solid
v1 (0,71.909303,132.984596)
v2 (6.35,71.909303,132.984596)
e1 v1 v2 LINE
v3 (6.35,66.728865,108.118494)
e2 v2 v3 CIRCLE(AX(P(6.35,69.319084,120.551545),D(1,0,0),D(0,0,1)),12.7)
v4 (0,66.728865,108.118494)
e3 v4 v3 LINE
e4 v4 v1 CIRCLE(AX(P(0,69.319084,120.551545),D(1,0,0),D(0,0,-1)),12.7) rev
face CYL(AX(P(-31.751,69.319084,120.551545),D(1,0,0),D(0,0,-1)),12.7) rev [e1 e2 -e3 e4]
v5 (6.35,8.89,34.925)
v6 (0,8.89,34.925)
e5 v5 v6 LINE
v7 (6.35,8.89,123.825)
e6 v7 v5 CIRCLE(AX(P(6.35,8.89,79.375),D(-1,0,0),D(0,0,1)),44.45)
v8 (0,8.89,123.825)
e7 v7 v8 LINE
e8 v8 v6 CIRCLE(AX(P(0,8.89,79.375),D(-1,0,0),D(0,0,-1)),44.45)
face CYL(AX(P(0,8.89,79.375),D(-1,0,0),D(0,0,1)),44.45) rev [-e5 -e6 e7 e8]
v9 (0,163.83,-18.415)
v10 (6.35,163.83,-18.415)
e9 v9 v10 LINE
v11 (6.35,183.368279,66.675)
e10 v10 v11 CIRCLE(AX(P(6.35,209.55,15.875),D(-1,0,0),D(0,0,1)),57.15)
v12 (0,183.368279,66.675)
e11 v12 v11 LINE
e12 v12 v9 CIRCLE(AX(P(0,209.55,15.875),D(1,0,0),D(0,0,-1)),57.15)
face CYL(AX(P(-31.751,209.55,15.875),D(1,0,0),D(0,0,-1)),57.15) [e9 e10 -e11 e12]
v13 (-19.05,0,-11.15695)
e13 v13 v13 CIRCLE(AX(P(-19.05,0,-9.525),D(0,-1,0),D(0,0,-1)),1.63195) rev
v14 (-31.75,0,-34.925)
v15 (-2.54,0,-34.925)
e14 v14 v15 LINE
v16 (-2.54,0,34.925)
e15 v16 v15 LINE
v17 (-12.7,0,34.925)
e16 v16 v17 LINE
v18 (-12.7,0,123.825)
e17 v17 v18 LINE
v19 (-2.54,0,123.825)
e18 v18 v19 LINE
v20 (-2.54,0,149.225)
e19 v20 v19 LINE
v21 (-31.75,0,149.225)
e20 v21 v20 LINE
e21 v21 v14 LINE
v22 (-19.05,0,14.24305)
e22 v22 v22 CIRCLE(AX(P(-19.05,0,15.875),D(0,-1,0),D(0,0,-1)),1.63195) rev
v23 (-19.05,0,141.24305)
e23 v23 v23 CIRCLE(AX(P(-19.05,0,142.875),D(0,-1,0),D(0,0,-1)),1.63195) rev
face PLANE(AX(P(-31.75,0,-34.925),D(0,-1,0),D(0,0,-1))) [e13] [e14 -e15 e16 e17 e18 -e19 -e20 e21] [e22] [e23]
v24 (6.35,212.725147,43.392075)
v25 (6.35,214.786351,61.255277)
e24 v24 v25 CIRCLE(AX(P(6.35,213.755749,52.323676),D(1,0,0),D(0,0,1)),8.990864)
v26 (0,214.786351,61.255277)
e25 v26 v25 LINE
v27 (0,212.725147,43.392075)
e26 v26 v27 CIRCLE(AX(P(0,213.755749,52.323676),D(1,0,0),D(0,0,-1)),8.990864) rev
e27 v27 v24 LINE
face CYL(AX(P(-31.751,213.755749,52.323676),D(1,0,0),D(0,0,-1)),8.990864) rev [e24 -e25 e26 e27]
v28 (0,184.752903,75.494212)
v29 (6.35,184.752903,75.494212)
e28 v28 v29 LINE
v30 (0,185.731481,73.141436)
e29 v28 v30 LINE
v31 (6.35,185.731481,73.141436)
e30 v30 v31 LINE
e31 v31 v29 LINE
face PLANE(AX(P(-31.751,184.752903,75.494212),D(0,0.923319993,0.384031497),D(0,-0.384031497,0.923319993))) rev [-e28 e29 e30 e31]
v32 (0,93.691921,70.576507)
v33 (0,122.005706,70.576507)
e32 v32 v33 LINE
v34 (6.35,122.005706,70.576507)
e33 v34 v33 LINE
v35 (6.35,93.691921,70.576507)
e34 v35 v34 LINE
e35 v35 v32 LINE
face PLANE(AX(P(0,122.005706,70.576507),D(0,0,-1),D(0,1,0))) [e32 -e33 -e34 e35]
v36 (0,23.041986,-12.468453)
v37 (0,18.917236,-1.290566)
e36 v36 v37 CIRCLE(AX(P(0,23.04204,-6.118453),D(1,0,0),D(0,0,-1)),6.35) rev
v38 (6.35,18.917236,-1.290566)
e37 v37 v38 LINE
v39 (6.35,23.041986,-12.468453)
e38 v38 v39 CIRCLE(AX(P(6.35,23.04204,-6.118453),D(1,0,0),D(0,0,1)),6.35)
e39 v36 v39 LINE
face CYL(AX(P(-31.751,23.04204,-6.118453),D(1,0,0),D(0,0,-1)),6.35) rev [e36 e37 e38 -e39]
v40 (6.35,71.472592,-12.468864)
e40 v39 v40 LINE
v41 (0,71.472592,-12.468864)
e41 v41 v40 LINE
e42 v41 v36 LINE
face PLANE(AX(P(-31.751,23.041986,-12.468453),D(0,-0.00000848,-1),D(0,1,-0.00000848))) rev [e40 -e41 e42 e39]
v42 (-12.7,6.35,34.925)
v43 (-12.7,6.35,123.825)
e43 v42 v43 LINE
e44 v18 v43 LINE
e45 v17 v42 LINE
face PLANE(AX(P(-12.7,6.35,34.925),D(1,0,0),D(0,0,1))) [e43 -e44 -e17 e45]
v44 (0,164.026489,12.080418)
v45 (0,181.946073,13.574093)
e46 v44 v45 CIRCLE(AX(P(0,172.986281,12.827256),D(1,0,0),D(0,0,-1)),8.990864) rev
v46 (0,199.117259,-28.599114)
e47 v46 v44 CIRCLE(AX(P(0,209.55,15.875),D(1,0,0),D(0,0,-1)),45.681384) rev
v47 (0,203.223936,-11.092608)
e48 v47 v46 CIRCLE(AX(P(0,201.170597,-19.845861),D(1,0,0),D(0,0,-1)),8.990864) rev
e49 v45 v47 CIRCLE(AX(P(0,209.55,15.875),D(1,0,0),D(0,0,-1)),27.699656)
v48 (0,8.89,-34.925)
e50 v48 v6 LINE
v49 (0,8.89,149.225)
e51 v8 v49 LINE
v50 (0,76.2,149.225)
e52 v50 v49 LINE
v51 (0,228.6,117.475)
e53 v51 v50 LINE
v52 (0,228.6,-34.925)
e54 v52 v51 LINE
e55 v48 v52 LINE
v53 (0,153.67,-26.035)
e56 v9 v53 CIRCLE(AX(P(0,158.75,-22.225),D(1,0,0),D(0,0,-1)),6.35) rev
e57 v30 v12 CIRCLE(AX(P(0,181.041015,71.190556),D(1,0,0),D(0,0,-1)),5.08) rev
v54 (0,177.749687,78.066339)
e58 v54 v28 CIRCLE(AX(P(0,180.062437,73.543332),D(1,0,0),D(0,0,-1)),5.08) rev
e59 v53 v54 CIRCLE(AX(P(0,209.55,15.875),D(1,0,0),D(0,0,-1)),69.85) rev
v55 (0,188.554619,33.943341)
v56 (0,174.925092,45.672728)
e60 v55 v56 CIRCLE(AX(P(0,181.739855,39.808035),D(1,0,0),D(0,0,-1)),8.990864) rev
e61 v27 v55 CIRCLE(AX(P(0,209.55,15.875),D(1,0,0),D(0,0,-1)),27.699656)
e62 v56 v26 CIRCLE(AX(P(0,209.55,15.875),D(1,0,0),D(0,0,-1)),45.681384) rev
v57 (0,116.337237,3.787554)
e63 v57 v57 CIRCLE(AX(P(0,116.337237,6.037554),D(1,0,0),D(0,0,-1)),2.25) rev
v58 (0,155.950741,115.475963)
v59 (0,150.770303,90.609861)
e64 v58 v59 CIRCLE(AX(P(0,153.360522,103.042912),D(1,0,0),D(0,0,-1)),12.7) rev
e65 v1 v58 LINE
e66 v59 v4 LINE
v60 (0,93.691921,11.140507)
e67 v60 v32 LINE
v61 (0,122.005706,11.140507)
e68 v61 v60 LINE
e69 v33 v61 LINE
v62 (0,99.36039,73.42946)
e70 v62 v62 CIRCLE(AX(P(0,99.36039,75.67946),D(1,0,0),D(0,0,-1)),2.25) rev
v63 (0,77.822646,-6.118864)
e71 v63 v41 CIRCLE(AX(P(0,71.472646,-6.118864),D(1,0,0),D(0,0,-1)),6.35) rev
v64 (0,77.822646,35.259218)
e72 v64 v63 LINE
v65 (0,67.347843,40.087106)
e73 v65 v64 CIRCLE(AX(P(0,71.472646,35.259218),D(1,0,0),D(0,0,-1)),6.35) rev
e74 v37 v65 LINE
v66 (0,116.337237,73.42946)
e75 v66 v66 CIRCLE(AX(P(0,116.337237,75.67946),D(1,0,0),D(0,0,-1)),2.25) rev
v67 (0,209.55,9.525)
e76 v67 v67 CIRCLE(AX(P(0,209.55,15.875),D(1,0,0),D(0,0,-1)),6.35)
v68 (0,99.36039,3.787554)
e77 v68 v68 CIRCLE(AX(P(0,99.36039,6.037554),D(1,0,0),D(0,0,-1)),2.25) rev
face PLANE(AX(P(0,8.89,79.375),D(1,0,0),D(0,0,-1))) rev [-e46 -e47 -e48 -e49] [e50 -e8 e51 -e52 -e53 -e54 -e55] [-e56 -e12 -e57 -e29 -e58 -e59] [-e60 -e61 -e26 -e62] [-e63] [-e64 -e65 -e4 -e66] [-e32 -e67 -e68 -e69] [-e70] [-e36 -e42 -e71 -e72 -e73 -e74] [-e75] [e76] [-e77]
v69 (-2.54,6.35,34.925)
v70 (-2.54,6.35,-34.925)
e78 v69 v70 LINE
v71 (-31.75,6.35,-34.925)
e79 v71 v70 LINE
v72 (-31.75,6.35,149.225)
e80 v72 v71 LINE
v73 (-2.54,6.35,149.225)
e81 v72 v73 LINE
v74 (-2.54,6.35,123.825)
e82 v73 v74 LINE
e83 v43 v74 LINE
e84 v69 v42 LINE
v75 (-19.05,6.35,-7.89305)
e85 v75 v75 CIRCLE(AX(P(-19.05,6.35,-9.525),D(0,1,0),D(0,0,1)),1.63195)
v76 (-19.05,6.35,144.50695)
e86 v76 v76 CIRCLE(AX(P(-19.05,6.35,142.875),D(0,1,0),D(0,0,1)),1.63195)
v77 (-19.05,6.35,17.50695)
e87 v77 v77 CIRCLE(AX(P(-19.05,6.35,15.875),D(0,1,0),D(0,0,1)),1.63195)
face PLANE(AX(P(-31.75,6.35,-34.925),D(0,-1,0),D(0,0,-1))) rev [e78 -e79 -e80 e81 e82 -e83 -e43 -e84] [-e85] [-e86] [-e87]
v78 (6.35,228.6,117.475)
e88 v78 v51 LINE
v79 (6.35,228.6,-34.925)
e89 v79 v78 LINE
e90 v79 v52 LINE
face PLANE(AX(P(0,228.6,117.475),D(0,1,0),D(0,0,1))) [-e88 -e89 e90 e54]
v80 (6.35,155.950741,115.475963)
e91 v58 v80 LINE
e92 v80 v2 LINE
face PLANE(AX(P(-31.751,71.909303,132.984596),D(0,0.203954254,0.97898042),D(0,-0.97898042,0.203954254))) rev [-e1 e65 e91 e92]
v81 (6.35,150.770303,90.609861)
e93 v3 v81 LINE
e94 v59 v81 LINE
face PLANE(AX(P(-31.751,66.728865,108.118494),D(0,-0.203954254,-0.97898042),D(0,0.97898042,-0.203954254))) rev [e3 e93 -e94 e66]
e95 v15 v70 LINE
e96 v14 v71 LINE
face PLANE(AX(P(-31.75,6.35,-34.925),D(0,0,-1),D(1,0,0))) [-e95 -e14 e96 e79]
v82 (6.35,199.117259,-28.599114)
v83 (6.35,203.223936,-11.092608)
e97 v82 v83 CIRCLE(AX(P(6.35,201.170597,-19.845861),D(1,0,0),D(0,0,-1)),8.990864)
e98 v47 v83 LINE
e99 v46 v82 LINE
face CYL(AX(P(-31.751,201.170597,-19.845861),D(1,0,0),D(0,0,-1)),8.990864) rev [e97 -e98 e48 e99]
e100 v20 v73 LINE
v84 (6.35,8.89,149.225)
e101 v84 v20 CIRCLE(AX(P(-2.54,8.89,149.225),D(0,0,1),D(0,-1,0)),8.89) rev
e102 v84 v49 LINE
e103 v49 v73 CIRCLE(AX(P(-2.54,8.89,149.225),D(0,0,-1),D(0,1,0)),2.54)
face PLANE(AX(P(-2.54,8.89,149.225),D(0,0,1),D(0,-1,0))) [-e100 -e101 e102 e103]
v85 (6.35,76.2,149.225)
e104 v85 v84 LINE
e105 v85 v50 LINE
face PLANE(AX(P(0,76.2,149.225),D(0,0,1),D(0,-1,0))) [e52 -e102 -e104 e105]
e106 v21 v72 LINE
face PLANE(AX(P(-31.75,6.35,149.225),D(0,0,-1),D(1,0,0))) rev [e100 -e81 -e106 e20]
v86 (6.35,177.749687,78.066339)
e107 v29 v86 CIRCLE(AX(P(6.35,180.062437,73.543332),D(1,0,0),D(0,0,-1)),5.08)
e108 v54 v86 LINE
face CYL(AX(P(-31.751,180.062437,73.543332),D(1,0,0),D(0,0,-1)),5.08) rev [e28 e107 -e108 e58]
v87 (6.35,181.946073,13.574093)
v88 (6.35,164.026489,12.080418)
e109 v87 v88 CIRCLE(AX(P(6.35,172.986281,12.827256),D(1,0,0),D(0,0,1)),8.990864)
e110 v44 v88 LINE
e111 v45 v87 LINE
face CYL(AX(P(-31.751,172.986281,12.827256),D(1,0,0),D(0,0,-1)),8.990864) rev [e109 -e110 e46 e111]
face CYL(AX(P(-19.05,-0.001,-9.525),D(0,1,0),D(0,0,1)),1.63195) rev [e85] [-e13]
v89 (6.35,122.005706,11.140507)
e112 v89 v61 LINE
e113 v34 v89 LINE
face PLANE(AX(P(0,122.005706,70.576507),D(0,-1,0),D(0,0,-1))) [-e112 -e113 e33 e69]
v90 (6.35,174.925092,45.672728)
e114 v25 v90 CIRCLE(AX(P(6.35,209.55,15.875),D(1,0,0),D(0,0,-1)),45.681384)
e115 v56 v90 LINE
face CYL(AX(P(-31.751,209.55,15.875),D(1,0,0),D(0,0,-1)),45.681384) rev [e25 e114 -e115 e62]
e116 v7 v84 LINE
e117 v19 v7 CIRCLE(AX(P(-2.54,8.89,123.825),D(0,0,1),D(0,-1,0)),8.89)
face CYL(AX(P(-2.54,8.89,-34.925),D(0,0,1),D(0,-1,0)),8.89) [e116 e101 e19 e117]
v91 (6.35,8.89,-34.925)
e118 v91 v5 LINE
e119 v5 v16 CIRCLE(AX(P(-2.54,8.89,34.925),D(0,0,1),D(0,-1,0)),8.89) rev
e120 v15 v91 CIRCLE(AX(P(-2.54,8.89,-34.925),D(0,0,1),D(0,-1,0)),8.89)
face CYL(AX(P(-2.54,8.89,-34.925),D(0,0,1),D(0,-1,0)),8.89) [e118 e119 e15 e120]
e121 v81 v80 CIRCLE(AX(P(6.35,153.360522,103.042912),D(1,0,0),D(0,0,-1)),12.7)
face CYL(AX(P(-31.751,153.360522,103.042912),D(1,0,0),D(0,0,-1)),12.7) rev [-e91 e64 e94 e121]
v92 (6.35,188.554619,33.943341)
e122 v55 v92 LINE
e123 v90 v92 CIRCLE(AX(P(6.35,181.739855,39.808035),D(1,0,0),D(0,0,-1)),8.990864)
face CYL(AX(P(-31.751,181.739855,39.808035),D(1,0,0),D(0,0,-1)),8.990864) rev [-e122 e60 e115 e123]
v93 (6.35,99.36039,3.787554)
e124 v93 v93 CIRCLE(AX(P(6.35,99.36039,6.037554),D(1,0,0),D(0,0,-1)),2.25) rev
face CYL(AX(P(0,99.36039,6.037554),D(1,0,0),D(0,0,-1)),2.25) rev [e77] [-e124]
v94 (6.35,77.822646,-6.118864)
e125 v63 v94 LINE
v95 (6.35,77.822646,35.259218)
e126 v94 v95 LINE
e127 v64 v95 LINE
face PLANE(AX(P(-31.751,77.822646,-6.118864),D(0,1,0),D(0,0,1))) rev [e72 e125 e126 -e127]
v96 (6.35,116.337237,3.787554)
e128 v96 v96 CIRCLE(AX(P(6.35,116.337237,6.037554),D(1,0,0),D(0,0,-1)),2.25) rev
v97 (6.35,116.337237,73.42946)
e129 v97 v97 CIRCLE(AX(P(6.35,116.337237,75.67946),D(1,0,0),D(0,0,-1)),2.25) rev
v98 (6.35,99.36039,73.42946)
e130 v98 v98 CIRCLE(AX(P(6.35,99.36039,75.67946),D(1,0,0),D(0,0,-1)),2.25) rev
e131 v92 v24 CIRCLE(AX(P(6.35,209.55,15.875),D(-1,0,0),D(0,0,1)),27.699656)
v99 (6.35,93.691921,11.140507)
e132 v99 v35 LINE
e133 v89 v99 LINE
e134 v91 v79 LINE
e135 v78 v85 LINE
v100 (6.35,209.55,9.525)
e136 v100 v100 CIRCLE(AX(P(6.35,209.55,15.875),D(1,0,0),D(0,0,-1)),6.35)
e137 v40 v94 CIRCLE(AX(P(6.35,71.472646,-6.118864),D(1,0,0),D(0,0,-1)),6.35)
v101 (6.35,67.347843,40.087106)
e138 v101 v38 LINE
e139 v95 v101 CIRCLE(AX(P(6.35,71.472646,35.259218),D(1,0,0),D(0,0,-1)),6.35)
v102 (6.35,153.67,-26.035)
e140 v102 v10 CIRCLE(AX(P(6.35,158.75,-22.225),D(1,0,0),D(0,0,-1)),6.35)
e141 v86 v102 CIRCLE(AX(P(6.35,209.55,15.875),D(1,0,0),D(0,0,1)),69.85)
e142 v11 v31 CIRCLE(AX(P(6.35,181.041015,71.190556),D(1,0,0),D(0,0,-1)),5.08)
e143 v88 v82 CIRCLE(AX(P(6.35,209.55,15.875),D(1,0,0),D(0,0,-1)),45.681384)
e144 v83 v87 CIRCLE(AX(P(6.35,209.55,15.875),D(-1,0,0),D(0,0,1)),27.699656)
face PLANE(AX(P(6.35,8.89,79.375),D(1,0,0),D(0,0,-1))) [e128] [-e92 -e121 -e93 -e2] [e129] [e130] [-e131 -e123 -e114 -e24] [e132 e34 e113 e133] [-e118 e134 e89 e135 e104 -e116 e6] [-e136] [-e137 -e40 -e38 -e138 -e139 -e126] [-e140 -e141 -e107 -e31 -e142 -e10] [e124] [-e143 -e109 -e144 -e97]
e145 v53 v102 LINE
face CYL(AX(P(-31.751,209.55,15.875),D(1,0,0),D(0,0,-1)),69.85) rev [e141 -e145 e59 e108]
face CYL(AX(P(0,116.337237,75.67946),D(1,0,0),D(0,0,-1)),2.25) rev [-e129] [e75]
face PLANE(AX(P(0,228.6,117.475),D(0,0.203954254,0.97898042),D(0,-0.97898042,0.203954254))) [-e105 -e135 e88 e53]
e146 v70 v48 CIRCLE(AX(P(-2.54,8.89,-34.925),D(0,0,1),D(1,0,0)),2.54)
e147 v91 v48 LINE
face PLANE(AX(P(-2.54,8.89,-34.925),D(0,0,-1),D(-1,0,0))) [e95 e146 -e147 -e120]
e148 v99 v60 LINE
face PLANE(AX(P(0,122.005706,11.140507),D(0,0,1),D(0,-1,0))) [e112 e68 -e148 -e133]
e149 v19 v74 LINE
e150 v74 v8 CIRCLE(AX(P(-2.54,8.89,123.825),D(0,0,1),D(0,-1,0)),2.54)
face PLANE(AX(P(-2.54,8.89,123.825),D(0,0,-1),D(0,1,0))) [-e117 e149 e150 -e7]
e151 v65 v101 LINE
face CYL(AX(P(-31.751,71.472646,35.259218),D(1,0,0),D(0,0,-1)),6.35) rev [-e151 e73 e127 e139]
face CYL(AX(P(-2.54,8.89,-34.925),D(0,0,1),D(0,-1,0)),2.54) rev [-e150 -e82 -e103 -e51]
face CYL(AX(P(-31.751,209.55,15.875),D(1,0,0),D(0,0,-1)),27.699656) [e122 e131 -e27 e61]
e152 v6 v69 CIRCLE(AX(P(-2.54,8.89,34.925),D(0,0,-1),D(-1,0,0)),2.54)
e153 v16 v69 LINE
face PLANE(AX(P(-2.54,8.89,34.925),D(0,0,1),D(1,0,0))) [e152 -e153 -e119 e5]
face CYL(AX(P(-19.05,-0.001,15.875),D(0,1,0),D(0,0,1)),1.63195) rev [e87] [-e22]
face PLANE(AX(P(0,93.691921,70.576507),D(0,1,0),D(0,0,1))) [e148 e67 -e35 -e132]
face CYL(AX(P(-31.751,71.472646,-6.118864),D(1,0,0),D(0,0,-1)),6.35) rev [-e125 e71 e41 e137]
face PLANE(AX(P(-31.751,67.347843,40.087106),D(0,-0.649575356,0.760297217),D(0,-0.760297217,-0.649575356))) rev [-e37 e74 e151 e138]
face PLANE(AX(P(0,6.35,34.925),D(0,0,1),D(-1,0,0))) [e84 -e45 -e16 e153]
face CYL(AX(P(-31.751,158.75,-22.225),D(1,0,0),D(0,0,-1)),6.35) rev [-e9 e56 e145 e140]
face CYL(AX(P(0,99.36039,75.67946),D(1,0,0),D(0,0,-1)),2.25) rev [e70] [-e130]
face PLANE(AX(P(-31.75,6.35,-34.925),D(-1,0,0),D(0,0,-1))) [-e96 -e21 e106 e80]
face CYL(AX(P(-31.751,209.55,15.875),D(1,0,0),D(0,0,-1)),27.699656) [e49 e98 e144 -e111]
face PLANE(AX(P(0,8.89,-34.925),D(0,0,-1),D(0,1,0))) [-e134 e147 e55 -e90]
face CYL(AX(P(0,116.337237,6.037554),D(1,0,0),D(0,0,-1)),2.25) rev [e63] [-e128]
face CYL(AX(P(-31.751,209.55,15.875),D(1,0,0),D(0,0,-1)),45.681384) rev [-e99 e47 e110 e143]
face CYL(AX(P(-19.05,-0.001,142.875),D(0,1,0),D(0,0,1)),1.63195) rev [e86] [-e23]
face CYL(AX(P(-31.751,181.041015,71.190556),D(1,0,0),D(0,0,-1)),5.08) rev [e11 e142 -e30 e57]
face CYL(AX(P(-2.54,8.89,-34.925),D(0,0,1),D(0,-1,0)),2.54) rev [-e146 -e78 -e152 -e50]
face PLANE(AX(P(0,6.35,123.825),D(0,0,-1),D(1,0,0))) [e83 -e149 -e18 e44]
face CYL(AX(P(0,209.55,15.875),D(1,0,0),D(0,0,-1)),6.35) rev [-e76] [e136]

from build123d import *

# Parameters (mm, degrees)
BOSS_EXTRUDE1_DEPTH  = 6.35
SKETCH5_W            = 184.15
SKETCH5_H            = 6.35
BOSS_EXTRUDE4_DEPTH  = 31.75
SKETCH6_W            = 12.7
SKETCH6_H            = 88.9
CUT_EXTRUDE2_DEPTH   = 270.576010849
CUT_EXTRUDE3_REACH   = 277.64
SKETCH7_R            = 2.25
SKETCH7_W            = 59.436
SKETCH7_H            = 28.313784743
SKETCH8_R            = 6.35
CUT_EXTRUDE4_DEPTH   = 276.640473489
FILLET1_R            = 2.54
CONVERT_SOLID1_START = -34.925
CONVERT_SOLID1_DEPTH = 184.15
CUT_EXTRUDE5_REACH   = 277.64
CUT_EXTRUDE6_REACH   = 271.576
SKETCH10_R           = 1.63195


# Read off the part's stored shape, not the designer's step: Convert-Solid1
with BuildPart() as part:
    # Sketch1 → Boss-Extrude1 (new body)
    with BuildSketch(Plane(origin=(0, 0, 0), x_dir=(0, 0, -1), z_dir=(1, 0, 0))):
        with BuildLine():
            Line((-117.475, 228.6), (34.925, 228.6))
            Line((34.925, 228.6), (34.925, 8.89))
            Line((34.925, 8.89), (34.925, 0))
            Line((34.925, 0), (-34.925, 0))
            Line((-34.925, 0), (-34.925, 8.89))
            ThreePointArc((-34.925, 8.89), (-79.375, 53.34), (-123.825, 8.89))
            Line((-123.825, 8.89), (-123.825, 0))
            Line((-123.825, 0), (-149.225, 0))
            Line((-149.225, 0), (-149.225, 76.2))
            Line((-149.225, 76.2), (-117.475, 228.6))
        make_face()
    extrude(amount=BOSS_EXTRUDE1_DEPTH)

    # Sketch5 → Boss-Extrude4 (add)
    with BuildSketch(Plane.ZY):
        with Locations((57.15, 3.175)):
            Rectangle(SKETCH5_W, SKETCH5_H)
    extrude(amount=BOSS_EXTRUDE4_DEPTH)

    # Sketch6 → Cut-Extrude2 (cut, through all)
    with BuildSketch(Plane(origin=(0, 6.35, 0), x_dir=(1, 0, 0), z_dir=(0, 1, 0))):
        with Locations((-6.35, -79.375)):
            Rectangle(SKETCH6_W, SKETCH6_H)
    extrude(amount=-CUT_EXTRUDE2_DEPTH, mode=Mode.SUBTRACT)

    # Sketch7 → Cut-Extrude3 (cut, up to next)
    with BuildSketch(Plane(origin=(6.35, 0, 0), x_dir=(0, 0, -1), z_dir=(1, 0, 0)), mode=Mode.PRIVATE) as cut_extrude3_sk1:
        with Locations((-75.679460058, 116.337237118)):
            Circle(SKETCH7_R)
    cut_extrude3_tool1 = extrude(cut_extrude3_sk1.sketch, amount=-CUT_EXTRUDE3_REACH, mode=Mode.PRIVATE) & part.part
    # Sketch7 → Cut-Extrude3 (cut, up to next)
    with BuildSketch(Plane(origin=(6.35, 0, 0), x_dir=(0, 0, -1), z_dir=(1, 0, 0)), mode=Mode.PRIVATE) as cut_extrude3_sk2:
        with Locations((-75.679460058, 99.360389657)):
            Circle(SKETCH7_R)
    cut_extrude3_tool2 = extrude(cut_extrude3_sk2.sketch, amount=-CUT_EXTRUDE3_REACH, mode=Mode.PRIVATE) & part.part
    # Sketch7 → Cut-Extrude3 (cut, up to next)
    with BuildSketch(Plane(origin=(6.35, 0, 0), x_dir=(0, 0, -1), z_dir=(1, 0, 0)), mode=Mode.PRIVATE) as cut_extrude3_sk3:
        with Locations((-6.03755368, 99.360389657)):
            Circle(SKETCH7_R)
    cut_extrude3_tool3 = extrude(cut_extrude3_sk3.sketch, amount=-CUT_EXTRUDE3_REACH, mode=Mode.PRIVATE) & part.part
    # Sketch7 → Cut-Extrude3 (cut, up to next)
    with BuildSketch(Plane(origin=(6.35, 0, 0), x_dir=(0, 0, -1), z_dir=(1, 0, 0)), mode=Mode.PRIVATE) as cut_extrude3_sk4:
        with Locations((-6.03755368, 116.337237118)):
            Circle(SKETCH7_R)
    cut_extrude3_tool4 = extrude(cut_extrude3_sk4.sketch, amount=-CUT_EXTRUDE3_REACH, mode=Mode.PRIVATE) & part.part
    # Sketch7 → Cut-Extrude3 (cut, up to next)
    with BuildSketch(Plane(origin=(6.35, 0, 0), x_dir=(0, 0, -1), z_dir=(1, 0, 0)), mode=Mode.PRIVATE) as cut_extrude3_sk5:
        with Locations((-40.858506869, 107.848813388)):
            Rectangle(SKETCH7_W, SKETCH7_H)
    cut_extrude3_tool5 = extrude(cut_extrude3_sk5.sketch, amount=-CUT_EXTRUDE3_REACH, mode=Mode.PRIVATE) & part.part
    add(cut_extrude3_tool1.solids().sort_by_distance((6.35, 116.337237, 75.67946))[0], mode=Mode.SUBTRACT)
    add(cut_extrude3_tool2.solids().sort_by_distance((6.35, 99.36039, 75.67946))[0], mode=Mode.SUBTRACT)
    add(cut_extrude3_tool3.solids().sort_by_distance((6.35, 99.36039, 6.037554))[0], mode=Mode.SUBTRACT)
    add(cut_extrude3_tool4.solids().sort_by_distance((6.35, 116.337237, 6.037554))[0], mode=Mode.SUBTRACT)
    add(cut_extrude3_tool5.solids().sort_by_distance((6.35, 107.848813, 40.858507))[0], mode=Mode.SUBTRACT)

    # Sketch8 → Cut-Extrude4 (cut, through all)
    with BuildSketch(Plane(origin=(6.35, 0, 0), x_dir=(0, 0, -1), z_dir=(1, 0, 0))):
        with Locations((-15.875, 209.55)):
            Circle(SKETCH8_R)
    extrude(amount=-CUT_EXTRUDE4_DEPTH, mode=Mode.SUBTRACT)

    # Fillet1
    fillet1_edges = [part.edges().sort_by_distance(p)[0] for p in [
        (0, 6.35, 136.525),
        (0, 6.35, 0),
    ]]
    fillet(fillet1_edges, radius=FILLET1_R)

    # Convert-Solid1 outline → Convert-Solid1 (cut)
    with BuildSketch(Plane.XY.offset(CONVERT_SOLID1_START)):
        with BuildLine():
            ThreePointArc((6.35, 8.89), (3.746179285, 2.603820715), (-2.54, 0))
            Line((-2.54, 0), (6.35, 0))
            Line((6.35, 0), (6.35, 8.89))
        make_face()
    extrude(amount=CONVERT_SOLID1_DEPTH, mode=Mode.SUBTRACT)

    # Sketch9 → Cut-Extrude5 (cut, up to next)
    with BuildSketch(Plane(origin=(6.35, 0, 0), x_dir=(0, 0, -1), z_dir=(1, 0, 0)), mode=Mode.PRIVATE) as cut_extrude5_sk1:
        with BuildLine():
            Line((-75.494212356, 184.752903033), (-73.141435562, 185.731480776))
            ThreePointArc((-73.141435562, 185.731480776), (-69.446832384, 185.812370314), (-66.675, 183.368279277))
            ThreePointArc((-66.675, 183.368279277), (-28.664883279, 153.84953873), (18.415, 163.83))
            ThreePointArc((18.415, 163.83), (27.305, 162.56), (26.035, 153.67))
            ThreePointArc((26.035, 153.67), (-31.616379009, 141.496848075), (-78.066338809, 177.749687467))
            ThreePointArc((-78.066338809, 177.749687467), (-78.311881244, 181.813820193), (-75.494212356, 184.752903033))
        make_face()
    cut_extrude5_tool1 = extrude(cut_extrude5_sk1.sketch, amount=-CUT_EXTRUDE5_REACH, mode=Mode.PRIVATE) & part.part
    # Sketch9 → Cut-Extrude5 (cut, up to next)
    with BuildSketch(Plane(origin=(6.35, 0, 0), x_dir=(0, 0, -1), z_dir=(1, 0, 0)), mode=Mode.PRIVATE) as cut_extrude5_sk2:
        with BuildLine():
            Line((-108.118493719, 66.728864942), (-90.609860799, 150.770302958))
            ThreePointArc((-90.609860799, 150.770302958), (-100.452693102, 165.793573316), (-115.47596346, 155.950741012))
            Line((-115.47596346, 155.950741012), (-132.98459638, 71.909302996))
            ThreePointArc((-132.98459638, 71.909302996), (-123.141764077, 56.886032638), (-108.118493719, 66.728864942))
        make_face()
    cut_extrude5_tool2 = extrude(cut_extrude5_sk2.sketch, amount=-CUT_EXTRUDE5_REACH, mode=Mode.PRIVATE) & part.part
    # Sketch9 → Cut-Extrude5 (cut, up to next)
    with BuildSketch(Plane(origin=(6.35, 0, 0), x_dir=(0, 0, -1), z_dir=(1, 0, 0)), mode=Mode.PRIVATE) as cut_extrude5_sk3:
        with BuildLine():
            Line((-40.087105739, 67.347842772), (1.2905656, 18.917236412))
            ThreePointArc((1.2905656, 18.917236412), (8.316769711, 17.084699632), (12.468452925, 23.041986075))
            Line((12.468452925, 23.041986075), (12.468863596, 71.472592434))
            ThreePointArc((12.468863596, 71.472592434), (10.609010694, 75.962755303), (6.118863596, 77.82264628))
            Line((6.118863596, 77.82264628), (-35.259218414, 77.82264628))
            ThreePointArc((-35.259218414, 77.82264628), (-41.026150106, 74.130652838), (-40.087105739, 67.347842772))
        make_face()
    cut_extrude5_tool3 = extrude(cut_extrude5_sk3.sketch, amount=-CUT_EXTRUDE5_REACH, mode=Mode.PRIVATE) & part.part
    # Sketch9 → Cut-Extrude5 (cut, up to next)
    with BuildSketch(Plane(origin=(6.35, 0, 0), x_dir=(0, 0, -1), z_dir=(1, 0, 0)), mode=Mode.PRIVATE) as cut_extrude5_sk4:
        with BuildLine():
            ThreePointArc((-61.255276679, 214.786351204), (-58.421011662, 192.917929262), (-45.672728213, 174.925091643))
            ThreePointArc((-45.672728213, 174.925091643), (-32.993270754, 175.875161813), (-33.943340924, 188.554619273))
            ThreePointArc((-33.943340924, 188.554619273), (-41.673471553, 199.464871288), (-43.392074603, 212.725147383))
            ThreePointArc((-43.392074603, 212.725147383), (-51.29307373, 222.687350332), (-61.255276679, 214.786351204))
        make_face()
    cut_extrude5_tool4 = extrude(cut_extrude5_sk4.sketch, amount=-CUT_EXTRUDE5_REACH, mode=Mode.PRIVATE) & part.part
    # Sketch9 → Cut-Extrude5 (cut, up to next)
    with BuildSketch(Plane(origin=(6.35, 0, 0), x_dir=(0, 0, -1), z_dir=(1, 0, 0)), mode=Mode.PRIVATE) as cut_extrude5_sk5:
        with BuildLine():
            ThreePointArc((-12.080418407, 164.026489196), (13.963017041, 174.959804504), (28.599113727, 199.117258578))
            ThreePointArc((28.599113727, 199.117258578), (21.899199613, 209.923850348), (11.092607844, 203.223936233))
            ThreePointArc((11.092607844, 203.223936233), (2.217770715, 188.575667985), (-13.574093253, 181.946073037))
            ThreePointArc((-13.574093253, 181.946073037), (-21.787047751, 172.239443693), (-12.080418407, 164.026489196))
        make_face()
    cut_extrude5_tool5 = extrude(cut_extrude5_sk5.sketch, amount=-CUT_EXTRUDE5_REACH, mode=Mode.PRIVATE) & part.part
    add(cut_extrude5_tool1.solids().sort_by_distance((6.35, 181.411079, 77.215324))[0], mode=Mode.SUBTRACT)
    add(cut_extrude5_tool2.solids().sort_by_distance((6.35, 111.339803, 111.797229))[0], mode=Mode.SUBTRACT)
    add(cut_extrude5_tool3.solids().sort_by_distance((6.35, 54.455432, 7.917782))[0], mode=Mode.SUBTRACT)
    add(cut_extrude5_tool4.solids().sort_by_distance((6.35, 197.006846, 47.961274))[0], mode=Mode.SUBTRACT)
    add(cut_extrude5_tool5.solids().sort_by_distance((6.35, 184.385964, -5.831872))[0], mode=Mode.SUBTRACT)

    # Sketch10 → Cut-Extrude6 (cut, up to next)
    with BuildSketch(Plane(origin=(0, 6.35, 0), x_dir=(1, 0, 0), z_dir=(0, 1, 0)), mode=Mode.PRIVATE) as cut_extrude6_sk1:
        with Locations(Location((-19.05, 9.525, 0), (0, 0, 270))):
            Circle(SKETCH10_R)
    cut_extrude6_tool1 = extrude(cut_extrude6_sk1.sketch, amount=-CUT_EXTRUDE6_REACH, mode=Mode.PRIVATE) & part.part
    # Sketch10 → Cut-Extrude6 (cut, up to next)
    with BuildSketch(Plane(origin=(0, 6.35, 0), x_dir=(1, 0, 0), z_dir=(0, 1, 0)), mode=Mode.PRIVATE) as cut_extrude6_sk2:
        with Locations(Location((-19.05, -15.875, 0), (0, 0, 270))):
            Circle(SKETCH10_R)
    cut_extrude6_tool2 = extrude(cut_extrude6_sk2.sketch, amount=-CUT_EXTRUDE6_REACH, mode=Mode.PRIVATE) & part.part
    # Sketch10 → Cut-Extrude6 (cut, up to next)
    with BuildSketch(Plane(origin=(0, 6.35, 0), x_dir=(1, 0, 0), z_dir=(0, 1, 0)), mode=Mode.PRIVATE) as cut_extrude6_sk3:
        with Locations(Location((-19.05, -142.875, 0), (0, 0, 270))):
            Circle(SKETCH10_R)
    cut_extrude6_tool3 = extrude(cut_extrude6_sk3.sketch, amount=-CUT_EXTRUDE6_REACH, mode=Mode.PRIVATE) & part.part
    add(cut_extrude6_tool1.solids().sort_by_distance((-19.05, 6.35, -9.525))[0], mode=Mode.SUBTRACT)
    add(cut_extrude6_tool2.solids().sort_by_distance((-19.05, 6.35, 15.875))[0], mode=Mode.SUBTRACT)
    add(cut_extrude6_tool3.solids().sort_by_distance((-19.05, 6.35, 142.875))[0], mode=Mode.SUBTRACT)


solid = part.part
